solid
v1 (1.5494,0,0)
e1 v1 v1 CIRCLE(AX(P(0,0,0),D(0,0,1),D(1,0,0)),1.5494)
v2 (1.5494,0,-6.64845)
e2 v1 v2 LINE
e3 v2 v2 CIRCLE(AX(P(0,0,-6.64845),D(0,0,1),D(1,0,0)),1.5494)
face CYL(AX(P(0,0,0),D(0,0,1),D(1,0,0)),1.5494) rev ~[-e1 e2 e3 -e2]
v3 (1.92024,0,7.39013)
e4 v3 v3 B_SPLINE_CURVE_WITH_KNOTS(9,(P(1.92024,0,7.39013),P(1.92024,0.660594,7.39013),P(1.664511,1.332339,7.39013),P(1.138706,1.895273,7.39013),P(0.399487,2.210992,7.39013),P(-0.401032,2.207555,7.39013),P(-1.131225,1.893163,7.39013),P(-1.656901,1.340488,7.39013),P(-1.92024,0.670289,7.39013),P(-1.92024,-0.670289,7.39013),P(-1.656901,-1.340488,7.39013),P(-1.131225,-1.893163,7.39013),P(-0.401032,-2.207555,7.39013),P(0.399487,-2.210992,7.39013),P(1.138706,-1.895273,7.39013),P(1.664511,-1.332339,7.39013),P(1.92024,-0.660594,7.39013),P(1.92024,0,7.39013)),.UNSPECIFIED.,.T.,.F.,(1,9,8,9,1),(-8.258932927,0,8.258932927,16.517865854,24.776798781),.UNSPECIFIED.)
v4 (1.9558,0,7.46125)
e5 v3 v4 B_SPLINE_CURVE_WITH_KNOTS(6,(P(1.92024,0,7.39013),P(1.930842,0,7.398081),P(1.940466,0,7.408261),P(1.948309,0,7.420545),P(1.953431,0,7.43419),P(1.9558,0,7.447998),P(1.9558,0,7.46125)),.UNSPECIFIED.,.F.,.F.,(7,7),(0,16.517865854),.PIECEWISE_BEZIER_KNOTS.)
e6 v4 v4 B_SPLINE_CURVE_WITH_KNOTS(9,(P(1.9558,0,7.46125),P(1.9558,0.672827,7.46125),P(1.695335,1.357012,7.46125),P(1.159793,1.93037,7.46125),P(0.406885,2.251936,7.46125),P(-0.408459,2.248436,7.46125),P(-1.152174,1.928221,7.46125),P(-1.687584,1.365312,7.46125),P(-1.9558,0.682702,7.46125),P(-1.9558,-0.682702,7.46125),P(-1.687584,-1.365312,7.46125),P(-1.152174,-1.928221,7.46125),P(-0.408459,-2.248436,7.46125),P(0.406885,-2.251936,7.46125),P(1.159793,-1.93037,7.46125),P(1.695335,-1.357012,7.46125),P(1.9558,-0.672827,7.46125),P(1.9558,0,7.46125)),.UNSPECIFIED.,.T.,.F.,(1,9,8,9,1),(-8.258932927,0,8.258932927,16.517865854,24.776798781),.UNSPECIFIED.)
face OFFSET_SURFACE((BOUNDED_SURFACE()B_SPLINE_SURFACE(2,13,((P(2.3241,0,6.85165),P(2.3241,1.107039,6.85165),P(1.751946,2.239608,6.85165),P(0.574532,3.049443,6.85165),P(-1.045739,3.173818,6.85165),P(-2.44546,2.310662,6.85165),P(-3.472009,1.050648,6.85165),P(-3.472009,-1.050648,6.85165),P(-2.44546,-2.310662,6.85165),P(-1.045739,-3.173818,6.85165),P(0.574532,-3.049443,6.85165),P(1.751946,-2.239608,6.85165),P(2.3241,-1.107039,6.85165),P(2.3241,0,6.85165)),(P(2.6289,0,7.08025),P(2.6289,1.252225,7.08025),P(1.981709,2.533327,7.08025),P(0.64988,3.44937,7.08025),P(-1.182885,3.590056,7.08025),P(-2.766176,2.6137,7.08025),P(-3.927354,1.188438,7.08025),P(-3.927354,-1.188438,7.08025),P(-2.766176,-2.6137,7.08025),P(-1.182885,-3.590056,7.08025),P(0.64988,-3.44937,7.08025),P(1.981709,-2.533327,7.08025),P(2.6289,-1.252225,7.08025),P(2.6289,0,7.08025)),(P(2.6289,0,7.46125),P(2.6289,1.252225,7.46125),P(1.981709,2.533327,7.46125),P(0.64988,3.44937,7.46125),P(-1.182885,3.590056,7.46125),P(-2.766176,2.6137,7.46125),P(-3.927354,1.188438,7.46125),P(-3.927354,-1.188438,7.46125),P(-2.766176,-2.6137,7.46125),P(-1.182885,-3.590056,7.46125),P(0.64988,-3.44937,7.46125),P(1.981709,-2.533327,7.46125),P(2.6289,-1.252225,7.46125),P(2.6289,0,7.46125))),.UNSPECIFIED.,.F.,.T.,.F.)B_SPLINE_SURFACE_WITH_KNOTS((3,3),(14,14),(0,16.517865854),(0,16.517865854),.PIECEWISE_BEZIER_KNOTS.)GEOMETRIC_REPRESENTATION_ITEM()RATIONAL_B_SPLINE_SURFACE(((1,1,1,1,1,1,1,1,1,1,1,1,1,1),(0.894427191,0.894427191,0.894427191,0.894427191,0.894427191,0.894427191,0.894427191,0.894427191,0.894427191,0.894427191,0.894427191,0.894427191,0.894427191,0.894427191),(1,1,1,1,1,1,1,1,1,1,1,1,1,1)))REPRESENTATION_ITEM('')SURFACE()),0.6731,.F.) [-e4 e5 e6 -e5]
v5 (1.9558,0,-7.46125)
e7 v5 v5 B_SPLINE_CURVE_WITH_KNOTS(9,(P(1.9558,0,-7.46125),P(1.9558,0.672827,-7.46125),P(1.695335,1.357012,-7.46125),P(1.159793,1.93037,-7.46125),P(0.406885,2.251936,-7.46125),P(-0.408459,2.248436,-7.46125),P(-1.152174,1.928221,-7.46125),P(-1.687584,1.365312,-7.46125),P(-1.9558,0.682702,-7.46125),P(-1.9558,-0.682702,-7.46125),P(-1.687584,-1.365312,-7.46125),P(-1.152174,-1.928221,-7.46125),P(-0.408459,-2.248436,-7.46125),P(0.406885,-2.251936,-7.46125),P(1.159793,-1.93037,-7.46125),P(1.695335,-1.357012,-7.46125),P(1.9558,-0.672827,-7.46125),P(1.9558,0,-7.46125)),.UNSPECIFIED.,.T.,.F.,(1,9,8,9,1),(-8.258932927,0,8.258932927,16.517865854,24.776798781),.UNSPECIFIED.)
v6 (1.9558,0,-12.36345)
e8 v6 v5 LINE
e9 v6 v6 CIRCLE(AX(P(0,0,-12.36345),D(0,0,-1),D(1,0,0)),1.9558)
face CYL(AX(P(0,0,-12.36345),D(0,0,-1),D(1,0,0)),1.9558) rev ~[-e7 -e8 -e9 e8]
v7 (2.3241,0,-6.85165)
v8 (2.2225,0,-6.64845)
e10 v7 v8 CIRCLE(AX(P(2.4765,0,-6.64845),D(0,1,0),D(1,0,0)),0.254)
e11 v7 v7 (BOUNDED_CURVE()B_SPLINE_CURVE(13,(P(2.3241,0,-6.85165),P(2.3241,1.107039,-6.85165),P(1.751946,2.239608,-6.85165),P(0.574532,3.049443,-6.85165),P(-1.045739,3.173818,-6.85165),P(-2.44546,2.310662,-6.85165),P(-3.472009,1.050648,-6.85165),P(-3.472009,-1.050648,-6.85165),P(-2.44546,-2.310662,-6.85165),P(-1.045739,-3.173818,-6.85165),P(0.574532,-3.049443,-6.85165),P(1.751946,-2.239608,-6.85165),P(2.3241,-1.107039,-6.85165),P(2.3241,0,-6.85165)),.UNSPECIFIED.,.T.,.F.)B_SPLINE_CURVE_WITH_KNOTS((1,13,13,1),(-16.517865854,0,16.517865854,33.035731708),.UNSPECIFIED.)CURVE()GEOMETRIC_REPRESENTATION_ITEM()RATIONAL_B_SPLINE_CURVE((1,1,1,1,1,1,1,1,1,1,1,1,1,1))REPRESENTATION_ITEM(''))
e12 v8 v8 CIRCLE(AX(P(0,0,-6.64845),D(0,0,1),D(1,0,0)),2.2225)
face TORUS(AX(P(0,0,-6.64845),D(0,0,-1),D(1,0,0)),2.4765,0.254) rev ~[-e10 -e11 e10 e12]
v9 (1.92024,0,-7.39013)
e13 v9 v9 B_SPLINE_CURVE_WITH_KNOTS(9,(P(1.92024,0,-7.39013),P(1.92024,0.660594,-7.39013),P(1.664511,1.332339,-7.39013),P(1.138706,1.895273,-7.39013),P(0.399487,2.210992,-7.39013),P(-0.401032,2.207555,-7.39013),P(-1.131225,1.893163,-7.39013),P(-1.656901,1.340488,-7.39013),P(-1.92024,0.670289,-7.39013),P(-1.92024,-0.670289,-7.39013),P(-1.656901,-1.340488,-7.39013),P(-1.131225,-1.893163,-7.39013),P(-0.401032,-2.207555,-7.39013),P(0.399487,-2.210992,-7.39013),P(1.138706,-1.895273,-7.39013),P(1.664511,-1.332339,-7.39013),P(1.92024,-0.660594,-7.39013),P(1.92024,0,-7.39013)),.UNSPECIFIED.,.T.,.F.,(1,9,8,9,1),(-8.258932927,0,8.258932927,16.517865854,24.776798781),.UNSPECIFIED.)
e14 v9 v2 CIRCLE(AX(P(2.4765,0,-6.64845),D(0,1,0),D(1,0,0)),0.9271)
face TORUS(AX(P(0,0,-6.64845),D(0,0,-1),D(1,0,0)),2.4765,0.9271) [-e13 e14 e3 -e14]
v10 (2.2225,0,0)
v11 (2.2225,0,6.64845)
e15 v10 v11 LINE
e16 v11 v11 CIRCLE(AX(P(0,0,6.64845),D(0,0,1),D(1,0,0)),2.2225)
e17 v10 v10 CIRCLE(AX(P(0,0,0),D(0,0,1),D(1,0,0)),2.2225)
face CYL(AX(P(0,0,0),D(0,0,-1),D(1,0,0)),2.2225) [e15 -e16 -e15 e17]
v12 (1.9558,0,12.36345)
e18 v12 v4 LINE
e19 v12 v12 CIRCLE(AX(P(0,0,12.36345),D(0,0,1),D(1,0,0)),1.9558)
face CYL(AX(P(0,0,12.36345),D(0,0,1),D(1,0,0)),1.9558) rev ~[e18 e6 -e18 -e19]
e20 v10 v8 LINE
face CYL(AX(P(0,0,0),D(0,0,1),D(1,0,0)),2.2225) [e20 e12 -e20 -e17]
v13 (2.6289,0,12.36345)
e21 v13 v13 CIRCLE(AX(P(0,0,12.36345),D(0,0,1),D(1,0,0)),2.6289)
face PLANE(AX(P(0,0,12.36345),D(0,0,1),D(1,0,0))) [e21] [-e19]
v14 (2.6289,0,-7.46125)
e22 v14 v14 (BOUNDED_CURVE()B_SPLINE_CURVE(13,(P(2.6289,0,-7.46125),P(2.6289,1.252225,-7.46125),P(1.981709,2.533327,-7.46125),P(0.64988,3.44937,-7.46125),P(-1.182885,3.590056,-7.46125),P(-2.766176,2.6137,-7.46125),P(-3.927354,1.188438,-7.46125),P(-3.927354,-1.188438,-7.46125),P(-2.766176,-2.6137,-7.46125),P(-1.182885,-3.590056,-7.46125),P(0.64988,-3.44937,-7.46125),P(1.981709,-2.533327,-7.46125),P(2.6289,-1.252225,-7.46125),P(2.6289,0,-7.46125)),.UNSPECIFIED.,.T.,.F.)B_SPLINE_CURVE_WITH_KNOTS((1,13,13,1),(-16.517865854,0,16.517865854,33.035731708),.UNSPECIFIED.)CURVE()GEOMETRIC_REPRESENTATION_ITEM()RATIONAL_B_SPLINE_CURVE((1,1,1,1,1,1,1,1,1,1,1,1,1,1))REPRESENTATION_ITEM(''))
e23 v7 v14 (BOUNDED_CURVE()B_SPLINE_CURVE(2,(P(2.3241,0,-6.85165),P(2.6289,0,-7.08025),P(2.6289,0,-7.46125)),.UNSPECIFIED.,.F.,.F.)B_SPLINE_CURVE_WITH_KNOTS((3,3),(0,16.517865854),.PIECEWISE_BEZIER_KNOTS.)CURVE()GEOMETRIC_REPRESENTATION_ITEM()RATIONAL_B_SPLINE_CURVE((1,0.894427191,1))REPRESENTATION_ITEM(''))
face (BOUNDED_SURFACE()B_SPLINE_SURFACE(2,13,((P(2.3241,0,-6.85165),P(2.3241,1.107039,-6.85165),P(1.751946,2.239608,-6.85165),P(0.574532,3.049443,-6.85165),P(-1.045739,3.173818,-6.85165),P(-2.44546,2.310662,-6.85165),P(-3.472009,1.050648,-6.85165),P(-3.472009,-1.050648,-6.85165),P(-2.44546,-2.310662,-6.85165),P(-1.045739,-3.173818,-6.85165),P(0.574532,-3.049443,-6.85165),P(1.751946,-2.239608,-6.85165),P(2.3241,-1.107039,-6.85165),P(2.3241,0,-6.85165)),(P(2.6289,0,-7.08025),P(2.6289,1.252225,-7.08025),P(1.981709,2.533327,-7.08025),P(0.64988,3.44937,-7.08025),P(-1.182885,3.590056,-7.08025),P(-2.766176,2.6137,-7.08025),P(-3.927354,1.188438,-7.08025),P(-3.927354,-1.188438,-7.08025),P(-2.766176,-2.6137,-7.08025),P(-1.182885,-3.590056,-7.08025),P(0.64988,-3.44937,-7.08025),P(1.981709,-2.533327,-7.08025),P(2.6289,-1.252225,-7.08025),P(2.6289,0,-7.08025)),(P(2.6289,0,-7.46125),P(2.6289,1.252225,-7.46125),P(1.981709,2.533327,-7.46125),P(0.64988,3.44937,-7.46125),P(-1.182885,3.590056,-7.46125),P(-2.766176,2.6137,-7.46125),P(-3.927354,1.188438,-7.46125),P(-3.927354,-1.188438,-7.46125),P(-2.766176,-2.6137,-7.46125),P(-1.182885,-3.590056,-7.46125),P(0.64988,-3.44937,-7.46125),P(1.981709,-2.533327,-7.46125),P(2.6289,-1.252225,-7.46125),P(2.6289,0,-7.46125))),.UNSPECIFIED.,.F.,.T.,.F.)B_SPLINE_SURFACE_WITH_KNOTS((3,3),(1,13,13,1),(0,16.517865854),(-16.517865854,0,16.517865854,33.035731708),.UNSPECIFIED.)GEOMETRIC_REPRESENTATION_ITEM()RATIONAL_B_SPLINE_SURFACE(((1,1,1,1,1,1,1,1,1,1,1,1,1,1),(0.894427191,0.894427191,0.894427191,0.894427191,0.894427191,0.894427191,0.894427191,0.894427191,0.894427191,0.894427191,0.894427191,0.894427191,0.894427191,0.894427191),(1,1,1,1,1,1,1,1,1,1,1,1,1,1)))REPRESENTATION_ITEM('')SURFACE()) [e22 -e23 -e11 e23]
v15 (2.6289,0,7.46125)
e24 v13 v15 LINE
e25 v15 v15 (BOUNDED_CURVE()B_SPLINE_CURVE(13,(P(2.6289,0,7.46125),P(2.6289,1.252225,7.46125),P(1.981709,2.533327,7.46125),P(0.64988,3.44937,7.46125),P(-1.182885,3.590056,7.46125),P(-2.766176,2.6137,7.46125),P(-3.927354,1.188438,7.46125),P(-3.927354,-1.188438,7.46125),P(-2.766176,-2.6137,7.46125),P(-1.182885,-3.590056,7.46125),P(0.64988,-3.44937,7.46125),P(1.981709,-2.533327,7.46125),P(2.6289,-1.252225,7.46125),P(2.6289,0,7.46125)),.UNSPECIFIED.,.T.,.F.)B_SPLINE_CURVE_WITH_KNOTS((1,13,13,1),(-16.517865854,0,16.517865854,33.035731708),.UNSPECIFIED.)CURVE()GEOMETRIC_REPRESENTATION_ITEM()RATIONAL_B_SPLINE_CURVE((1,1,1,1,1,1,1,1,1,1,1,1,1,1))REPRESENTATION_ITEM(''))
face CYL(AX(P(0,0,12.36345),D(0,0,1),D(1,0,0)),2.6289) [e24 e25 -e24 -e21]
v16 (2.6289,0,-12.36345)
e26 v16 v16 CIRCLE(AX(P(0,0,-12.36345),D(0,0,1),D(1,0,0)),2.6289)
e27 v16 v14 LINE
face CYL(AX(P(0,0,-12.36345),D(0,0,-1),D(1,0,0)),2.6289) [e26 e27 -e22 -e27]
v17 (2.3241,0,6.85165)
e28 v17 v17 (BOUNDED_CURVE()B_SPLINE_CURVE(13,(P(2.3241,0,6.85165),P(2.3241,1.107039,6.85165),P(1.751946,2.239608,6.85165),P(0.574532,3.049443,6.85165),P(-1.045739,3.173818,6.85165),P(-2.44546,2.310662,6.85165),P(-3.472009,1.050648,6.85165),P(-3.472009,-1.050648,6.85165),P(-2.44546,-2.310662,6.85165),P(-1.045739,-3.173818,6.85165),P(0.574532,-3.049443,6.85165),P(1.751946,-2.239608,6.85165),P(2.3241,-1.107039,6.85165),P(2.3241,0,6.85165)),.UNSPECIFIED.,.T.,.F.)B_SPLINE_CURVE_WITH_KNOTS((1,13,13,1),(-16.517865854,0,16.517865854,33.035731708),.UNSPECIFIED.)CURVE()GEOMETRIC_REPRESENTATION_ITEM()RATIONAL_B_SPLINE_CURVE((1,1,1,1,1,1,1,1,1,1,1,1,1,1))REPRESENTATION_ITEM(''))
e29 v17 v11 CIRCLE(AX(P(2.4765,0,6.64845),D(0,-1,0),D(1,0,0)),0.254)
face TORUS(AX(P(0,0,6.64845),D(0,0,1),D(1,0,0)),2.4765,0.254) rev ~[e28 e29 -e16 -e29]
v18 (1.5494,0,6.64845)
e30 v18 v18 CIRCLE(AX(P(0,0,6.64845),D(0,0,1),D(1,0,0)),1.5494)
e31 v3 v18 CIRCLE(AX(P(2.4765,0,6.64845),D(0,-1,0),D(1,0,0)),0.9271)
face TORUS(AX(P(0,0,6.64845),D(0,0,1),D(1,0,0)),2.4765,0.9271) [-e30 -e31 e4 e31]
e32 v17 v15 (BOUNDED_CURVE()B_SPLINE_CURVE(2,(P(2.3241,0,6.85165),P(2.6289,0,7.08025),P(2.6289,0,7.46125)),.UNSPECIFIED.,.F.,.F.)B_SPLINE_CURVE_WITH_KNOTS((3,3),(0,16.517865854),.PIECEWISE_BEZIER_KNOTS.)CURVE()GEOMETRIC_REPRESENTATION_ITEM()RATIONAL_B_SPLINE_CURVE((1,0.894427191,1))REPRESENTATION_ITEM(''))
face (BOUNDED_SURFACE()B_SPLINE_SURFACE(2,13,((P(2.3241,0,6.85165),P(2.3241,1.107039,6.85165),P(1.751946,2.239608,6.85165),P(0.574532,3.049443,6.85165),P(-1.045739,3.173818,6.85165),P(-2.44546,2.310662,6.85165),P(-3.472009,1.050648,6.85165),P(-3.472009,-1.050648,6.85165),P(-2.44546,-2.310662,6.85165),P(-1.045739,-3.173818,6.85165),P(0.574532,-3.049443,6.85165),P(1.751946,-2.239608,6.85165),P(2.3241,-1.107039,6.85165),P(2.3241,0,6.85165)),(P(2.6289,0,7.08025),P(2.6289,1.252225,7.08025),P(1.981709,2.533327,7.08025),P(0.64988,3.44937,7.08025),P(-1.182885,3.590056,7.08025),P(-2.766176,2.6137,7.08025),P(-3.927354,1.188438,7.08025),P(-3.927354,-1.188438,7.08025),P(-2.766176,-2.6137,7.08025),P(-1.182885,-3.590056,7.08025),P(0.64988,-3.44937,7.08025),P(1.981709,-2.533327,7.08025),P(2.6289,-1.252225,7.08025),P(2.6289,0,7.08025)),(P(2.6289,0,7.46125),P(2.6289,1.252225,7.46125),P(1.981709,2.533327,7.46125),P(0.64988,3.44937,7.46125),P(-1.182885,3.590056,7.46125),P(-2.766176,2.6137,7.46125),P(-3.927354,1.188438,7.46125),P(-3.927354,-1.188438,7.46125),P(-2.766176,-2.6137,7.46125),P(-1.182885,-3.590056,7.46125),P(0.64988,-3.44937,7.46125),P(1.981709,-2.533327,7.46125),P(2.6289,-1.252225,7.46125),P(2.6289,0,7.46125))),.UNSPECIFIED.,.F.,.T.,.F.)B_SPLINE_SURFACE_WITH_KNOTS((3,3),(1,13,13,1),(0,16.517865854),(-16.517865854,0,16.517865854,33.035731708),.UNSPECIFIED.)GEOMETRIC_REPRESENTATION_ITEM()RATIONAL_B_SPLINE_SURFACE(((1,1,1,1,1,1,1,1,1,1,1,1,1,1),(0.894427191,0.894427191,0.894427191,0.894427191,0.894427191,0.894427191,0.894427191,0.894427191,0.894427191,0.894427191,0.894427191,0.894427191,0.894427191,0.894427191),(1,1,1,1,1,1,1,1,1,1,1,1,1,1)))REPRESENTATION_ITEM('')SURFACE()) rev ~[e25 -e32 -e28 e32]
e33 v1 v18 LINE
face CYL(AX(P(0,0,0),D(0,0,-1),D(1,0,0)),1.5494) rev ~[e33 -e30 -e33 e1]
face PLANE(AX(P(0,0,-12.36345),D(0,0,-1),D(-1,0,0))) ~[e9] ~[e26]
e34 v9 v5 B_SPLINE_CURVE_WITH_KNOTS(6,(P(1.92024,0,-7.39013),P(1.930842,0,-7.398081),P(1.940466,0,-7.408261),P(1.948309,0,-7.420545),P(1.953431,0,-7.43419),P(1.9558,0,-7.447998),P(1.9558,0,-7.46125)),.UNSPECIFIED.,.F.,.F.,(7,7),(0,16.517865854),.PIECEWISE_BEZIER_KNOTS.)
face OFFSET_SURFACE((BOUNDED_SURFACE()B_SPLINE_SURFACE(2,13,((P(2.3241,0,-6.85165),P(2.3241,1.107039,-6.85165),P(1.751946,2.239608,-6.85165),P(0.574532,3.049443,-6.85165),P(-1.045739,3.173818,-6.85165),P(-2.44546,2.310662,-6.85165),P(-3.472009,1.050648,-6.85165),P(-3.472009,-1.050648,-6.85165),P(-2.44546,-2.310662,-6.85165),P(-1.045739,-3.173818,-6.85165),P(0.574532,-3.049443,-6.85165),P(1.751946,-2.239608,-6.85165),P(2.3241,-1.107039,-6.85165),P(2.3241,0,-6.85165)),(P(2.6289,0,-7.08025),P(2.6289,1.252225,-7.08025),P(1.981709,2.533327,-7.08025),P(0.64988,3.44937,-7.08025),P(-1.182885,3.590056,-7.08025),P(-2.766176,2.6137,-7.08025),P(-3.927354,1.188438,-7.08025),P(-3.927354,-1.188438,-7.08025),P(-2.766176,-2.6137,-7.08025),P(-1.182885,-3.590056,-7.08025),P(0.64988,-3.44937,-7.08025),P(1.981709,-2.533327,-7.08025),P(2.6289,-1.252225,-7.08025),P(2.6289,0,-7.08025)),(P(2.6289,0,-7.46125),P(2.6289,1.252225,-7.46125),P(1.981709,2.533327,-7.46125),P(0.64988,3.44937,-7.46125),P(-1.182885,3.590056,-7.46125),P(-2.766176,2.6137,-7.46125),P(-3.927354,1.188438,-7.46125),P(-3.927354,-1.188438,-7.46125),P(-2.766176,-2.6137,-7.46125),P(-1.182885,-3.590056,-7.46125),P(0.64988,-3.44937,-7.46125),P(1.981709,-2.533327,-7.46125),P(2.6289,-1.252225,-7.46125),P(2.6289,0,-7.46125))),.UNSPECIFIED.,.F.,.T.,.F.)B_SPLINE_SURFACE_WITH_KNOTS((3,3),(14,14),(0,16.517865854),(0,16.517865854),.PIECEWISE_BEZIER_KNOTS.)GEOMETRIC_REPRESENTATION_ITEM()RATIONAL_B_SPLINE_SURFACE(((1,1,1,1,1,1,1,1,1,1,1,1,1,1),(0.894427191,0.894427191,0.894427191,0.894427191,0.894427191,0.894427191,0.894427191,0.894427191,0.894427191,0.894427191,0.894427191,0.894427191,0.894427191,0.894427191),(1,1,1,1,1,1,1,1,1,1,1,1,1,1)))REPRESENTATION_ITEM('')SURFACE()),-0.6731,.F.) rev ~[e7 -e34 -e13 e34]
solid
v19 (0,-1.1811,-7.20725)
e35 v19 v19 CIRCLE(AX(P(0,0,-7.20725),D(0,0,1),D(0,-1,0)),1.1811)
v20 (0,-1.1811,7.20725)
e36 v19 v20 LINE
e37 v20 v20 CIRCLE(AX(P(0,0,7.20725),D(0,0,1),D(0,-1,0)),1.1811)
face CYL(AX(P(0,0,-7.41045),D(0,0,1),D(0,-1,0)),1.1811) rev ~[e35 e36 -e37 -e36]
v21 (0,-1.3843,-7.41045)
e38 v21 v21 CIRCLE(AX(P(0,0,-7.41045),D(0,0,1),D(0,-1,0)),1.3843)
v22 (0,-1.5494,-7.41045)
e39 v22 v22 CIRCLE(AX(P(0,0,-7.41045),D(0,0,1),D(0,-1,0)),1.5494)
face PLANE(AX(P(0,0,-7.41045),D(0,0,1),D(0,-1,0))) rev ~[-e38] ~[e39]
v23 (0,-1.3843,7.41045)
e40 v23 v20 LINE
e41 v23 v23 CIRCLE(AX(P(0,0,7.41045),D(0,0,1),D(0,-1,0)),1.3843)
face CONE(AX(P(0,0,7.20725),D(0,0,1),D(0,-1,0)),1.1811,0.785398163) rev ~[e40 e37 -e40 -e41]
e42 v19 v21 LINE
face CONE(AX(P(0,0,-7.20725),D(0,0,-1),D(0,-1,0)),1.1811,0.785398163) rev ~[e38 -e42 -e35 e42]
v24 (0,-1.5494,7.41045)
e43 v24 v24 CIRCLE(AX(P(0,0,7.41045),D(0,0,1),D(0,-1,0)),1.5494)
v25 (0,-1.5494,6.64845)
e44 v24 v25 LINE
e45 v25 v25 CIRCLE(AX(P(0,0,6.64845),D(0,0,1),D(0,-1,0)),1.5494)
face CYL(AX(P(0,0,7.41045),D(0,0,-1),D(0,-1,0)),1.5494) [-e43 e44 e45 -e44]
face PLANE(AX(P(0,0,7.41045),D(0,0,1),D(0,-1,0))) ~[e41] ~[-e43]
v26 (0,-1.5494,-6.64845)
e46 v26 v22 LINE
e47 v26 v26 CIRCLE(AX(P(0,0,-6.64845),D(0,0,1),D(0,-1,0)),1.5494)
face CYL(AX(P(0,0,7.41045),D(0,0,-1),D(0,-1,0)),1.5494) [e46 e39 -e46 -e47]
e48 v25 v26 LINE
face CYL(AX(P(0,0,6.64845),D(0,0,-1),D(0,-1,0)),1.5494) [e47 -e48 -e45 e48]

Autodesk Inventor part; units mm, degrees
ref_plane "YZ Plane" through (0, 0, 0) normal (1, 0, 0) x (0, 1, 0)
ref_plane "XZ Plane" through (0, 0, 0) normal (0, 1, 0) x (-1, 0, 0)
ref_plane "XY Plane" through (0, 0, 0) normal (0, 0, 1) x (1, 0, 0)
sketch "Sketch1" plane through (0, 0, 0) normal (0, 0, 1) x (1, 0, 0)
  circle A0 centre (0, 0) radius 2.2225
  dimension "d0" = 4.445
extrude "Extrusion1" add sketch "Sketch1" along normal mid plane 24.7269
sketch "Sketch2" plane through (0, 0, 12.36345) normal (0, 0, 1) x (1, 0, 0)
  circle A0 centre (0, 0) radius 2.2225 projected
  circle A1 centre (0, 0) radius 2.6289
  dimension "d3" = 5.2578
extrude "Extrusion2" add sketch "Sketch2" against normal blind 5.461
fillet "Fillet1" radius 0.254 1 edges at (-2.2225, 0, 6.9024)
fillet "Fillet2" radius 0.762 1 edges at (-2.6289, 0, 6.9024)
mirror "Mirror1" about plane through (0, 0, 0) normal (0, 0, 1) of "Extrusion2", "Fillet1", "Fillet2"
shell "Shell1" thickness 0.6731 removed faces 2 at (-0.850836, 0.209712, -12.36345) at (-0.850836, 0.209712, 12.36345)
sketch "Sketch3" plane through (0, 0, 0) normal (1, 0, 0) x (0, 1, 0)
  line L0 (-2.6289, 7.46125) -> (-2.6289, 12.36345)
  line L1 (-2.6289, 12.36345) -> (-1.9558, 12.36345)
  line L2 (-1.9558, 12.36345) -> (-1.9558, 7.46125)
  line L3 (-1.5494, 6.64845) -> (-1.5494, -6.64845)
  line L4 (-1.9558, -7.46125) -> (-1.9558, -12.36345)
  line L5 (-1.9558, -12.36345) -> (-2.6289, -12.36345)
  line L6 (-2.6289, -12.36345) -> (-2.6289, -7.46125)
  arc A0 (-2.3241, -6.85165) -> (-2.2225, -6.64845) centre (-2.4765, -6.64845) ccw
  line L7 (-2.2225, -6.64845) -> (-2.2225, 6.64845)
  arc A1 (-2.2225, 6.64845) -> (-2.3241, 6.85165) centre (-2.4765, 6.64845) ccw
  arc A2 (2.3241, 6.85165) -> (2.2225, 6.64845) centre (2.4765, 6.64845) ccw
  line L8 (2.2225, 6.64845) -> (2.2225, -6.64845)
  arc A3 (2.2225, -6.64845) -> (2.3241, -6.85165) centre (2.4765, -6.64845) ccw
  line L9 (2.6289, -7.46125) -> (2.6289, -12.36345)
  line L10 (2.6289, -12.36345) -> (1.9558, -12.36345)
  line L11 (1.9558, -12.36345) -> (1.9558, -7.46125)
  line L12 (1.5494, -6.64845) -> (1.5494, 6.64845)
  line L13 (1.9558, 7.46125) -> (1.9558, 12.36345)
  line L14 (1.9558, 12.36345) -> (2.6289, 12.36345)
  line L15 (2.6289, 12.36345) -> (2.6289, 7.46125)
  line L16 (-1.5494, -7.41045) -> (-1.1811, -7.41045)
  line L17 (-1.1811, -7.41045) -> (-1.1811, 7.41045)
  line L18 (-1.1811, 7.41045) -> (-1.5494, 7.41045)
  line L19 (-1.5494, 7.41045) -> (-1.5494, -7.41045)
  line L20 (0, -17.30883) -> (0, 17.30883)
  arc A4 (-2.6289, 7.46125) -> (-2.3241, 6.85165) centre (-1.8669, 7.46125) ccw
  arc A5 (-1.9558, 7.46125) -> (-1.92024, 7.39013) centre (-1.8669, 7.46125) ccw
  arc A6 (-1.5494, 6.64845) -> (-1.92024, 7.39013) centre (-2.4765, 6.64845) ccw
  arc A7 (-1.92024, -7.39013) -> (-1.5494, -6.64845) centre (-2.4765, -6.64845) ccw
  arc A8 (-1.92024, -7.39013) -> (-1.9558, -7.46125) centre (-1.8669, -7.46125) ccw
  arc A9 (-2.3241, -6.85165) -> (-2.6289, -7.46125) centre (-1.8669, -7.46125) ccw
  arc A10 (2.3241, 6.85165) -> (2.6289, 7.46125) centre (1.8669, 7.46125) ccw
  arc A11 (2.6289, -7.46125) -> (2.3241, -6.85165) centre (1.8669, -7.46125) ccw
  arc A12 (1.9558, -7.46125) -> (1.92024, -7.39013) centre (1.8669, -7.46125) ccw
  arc A13 (1.5494, -6.64845) -> (1.92024, -7.39013) centre (2.4765, -6.64845) ccw
  arc A14 (1.92024, 7.39013) -> (1.5494, 6.64845) centre (2.4765, 6.64845) ccw
  arc A15 (1.92024, 7.39013) -> (1.9558, 7.46125) centre (1.8669, 7.46125) ccw
  point P0 (0, 0)
  dimension "d9" = 0.3683
  dimension "d10" = 0.762
  dimension "d11" = 0.762
revolve "Revolution1" add sketch "Sketch3" angle 360 about axis through (0, 0, -10) along (0, 0, 1) separate body contours L19 L18 L17 L16 L3
chamfer "Chamfer1" distance 0.2032 angle 45 2 edges at (0, 1.1811, 7.4105) (0, 1.1811, -7.4105)
properties part number "22-18 double sided female tube red"
